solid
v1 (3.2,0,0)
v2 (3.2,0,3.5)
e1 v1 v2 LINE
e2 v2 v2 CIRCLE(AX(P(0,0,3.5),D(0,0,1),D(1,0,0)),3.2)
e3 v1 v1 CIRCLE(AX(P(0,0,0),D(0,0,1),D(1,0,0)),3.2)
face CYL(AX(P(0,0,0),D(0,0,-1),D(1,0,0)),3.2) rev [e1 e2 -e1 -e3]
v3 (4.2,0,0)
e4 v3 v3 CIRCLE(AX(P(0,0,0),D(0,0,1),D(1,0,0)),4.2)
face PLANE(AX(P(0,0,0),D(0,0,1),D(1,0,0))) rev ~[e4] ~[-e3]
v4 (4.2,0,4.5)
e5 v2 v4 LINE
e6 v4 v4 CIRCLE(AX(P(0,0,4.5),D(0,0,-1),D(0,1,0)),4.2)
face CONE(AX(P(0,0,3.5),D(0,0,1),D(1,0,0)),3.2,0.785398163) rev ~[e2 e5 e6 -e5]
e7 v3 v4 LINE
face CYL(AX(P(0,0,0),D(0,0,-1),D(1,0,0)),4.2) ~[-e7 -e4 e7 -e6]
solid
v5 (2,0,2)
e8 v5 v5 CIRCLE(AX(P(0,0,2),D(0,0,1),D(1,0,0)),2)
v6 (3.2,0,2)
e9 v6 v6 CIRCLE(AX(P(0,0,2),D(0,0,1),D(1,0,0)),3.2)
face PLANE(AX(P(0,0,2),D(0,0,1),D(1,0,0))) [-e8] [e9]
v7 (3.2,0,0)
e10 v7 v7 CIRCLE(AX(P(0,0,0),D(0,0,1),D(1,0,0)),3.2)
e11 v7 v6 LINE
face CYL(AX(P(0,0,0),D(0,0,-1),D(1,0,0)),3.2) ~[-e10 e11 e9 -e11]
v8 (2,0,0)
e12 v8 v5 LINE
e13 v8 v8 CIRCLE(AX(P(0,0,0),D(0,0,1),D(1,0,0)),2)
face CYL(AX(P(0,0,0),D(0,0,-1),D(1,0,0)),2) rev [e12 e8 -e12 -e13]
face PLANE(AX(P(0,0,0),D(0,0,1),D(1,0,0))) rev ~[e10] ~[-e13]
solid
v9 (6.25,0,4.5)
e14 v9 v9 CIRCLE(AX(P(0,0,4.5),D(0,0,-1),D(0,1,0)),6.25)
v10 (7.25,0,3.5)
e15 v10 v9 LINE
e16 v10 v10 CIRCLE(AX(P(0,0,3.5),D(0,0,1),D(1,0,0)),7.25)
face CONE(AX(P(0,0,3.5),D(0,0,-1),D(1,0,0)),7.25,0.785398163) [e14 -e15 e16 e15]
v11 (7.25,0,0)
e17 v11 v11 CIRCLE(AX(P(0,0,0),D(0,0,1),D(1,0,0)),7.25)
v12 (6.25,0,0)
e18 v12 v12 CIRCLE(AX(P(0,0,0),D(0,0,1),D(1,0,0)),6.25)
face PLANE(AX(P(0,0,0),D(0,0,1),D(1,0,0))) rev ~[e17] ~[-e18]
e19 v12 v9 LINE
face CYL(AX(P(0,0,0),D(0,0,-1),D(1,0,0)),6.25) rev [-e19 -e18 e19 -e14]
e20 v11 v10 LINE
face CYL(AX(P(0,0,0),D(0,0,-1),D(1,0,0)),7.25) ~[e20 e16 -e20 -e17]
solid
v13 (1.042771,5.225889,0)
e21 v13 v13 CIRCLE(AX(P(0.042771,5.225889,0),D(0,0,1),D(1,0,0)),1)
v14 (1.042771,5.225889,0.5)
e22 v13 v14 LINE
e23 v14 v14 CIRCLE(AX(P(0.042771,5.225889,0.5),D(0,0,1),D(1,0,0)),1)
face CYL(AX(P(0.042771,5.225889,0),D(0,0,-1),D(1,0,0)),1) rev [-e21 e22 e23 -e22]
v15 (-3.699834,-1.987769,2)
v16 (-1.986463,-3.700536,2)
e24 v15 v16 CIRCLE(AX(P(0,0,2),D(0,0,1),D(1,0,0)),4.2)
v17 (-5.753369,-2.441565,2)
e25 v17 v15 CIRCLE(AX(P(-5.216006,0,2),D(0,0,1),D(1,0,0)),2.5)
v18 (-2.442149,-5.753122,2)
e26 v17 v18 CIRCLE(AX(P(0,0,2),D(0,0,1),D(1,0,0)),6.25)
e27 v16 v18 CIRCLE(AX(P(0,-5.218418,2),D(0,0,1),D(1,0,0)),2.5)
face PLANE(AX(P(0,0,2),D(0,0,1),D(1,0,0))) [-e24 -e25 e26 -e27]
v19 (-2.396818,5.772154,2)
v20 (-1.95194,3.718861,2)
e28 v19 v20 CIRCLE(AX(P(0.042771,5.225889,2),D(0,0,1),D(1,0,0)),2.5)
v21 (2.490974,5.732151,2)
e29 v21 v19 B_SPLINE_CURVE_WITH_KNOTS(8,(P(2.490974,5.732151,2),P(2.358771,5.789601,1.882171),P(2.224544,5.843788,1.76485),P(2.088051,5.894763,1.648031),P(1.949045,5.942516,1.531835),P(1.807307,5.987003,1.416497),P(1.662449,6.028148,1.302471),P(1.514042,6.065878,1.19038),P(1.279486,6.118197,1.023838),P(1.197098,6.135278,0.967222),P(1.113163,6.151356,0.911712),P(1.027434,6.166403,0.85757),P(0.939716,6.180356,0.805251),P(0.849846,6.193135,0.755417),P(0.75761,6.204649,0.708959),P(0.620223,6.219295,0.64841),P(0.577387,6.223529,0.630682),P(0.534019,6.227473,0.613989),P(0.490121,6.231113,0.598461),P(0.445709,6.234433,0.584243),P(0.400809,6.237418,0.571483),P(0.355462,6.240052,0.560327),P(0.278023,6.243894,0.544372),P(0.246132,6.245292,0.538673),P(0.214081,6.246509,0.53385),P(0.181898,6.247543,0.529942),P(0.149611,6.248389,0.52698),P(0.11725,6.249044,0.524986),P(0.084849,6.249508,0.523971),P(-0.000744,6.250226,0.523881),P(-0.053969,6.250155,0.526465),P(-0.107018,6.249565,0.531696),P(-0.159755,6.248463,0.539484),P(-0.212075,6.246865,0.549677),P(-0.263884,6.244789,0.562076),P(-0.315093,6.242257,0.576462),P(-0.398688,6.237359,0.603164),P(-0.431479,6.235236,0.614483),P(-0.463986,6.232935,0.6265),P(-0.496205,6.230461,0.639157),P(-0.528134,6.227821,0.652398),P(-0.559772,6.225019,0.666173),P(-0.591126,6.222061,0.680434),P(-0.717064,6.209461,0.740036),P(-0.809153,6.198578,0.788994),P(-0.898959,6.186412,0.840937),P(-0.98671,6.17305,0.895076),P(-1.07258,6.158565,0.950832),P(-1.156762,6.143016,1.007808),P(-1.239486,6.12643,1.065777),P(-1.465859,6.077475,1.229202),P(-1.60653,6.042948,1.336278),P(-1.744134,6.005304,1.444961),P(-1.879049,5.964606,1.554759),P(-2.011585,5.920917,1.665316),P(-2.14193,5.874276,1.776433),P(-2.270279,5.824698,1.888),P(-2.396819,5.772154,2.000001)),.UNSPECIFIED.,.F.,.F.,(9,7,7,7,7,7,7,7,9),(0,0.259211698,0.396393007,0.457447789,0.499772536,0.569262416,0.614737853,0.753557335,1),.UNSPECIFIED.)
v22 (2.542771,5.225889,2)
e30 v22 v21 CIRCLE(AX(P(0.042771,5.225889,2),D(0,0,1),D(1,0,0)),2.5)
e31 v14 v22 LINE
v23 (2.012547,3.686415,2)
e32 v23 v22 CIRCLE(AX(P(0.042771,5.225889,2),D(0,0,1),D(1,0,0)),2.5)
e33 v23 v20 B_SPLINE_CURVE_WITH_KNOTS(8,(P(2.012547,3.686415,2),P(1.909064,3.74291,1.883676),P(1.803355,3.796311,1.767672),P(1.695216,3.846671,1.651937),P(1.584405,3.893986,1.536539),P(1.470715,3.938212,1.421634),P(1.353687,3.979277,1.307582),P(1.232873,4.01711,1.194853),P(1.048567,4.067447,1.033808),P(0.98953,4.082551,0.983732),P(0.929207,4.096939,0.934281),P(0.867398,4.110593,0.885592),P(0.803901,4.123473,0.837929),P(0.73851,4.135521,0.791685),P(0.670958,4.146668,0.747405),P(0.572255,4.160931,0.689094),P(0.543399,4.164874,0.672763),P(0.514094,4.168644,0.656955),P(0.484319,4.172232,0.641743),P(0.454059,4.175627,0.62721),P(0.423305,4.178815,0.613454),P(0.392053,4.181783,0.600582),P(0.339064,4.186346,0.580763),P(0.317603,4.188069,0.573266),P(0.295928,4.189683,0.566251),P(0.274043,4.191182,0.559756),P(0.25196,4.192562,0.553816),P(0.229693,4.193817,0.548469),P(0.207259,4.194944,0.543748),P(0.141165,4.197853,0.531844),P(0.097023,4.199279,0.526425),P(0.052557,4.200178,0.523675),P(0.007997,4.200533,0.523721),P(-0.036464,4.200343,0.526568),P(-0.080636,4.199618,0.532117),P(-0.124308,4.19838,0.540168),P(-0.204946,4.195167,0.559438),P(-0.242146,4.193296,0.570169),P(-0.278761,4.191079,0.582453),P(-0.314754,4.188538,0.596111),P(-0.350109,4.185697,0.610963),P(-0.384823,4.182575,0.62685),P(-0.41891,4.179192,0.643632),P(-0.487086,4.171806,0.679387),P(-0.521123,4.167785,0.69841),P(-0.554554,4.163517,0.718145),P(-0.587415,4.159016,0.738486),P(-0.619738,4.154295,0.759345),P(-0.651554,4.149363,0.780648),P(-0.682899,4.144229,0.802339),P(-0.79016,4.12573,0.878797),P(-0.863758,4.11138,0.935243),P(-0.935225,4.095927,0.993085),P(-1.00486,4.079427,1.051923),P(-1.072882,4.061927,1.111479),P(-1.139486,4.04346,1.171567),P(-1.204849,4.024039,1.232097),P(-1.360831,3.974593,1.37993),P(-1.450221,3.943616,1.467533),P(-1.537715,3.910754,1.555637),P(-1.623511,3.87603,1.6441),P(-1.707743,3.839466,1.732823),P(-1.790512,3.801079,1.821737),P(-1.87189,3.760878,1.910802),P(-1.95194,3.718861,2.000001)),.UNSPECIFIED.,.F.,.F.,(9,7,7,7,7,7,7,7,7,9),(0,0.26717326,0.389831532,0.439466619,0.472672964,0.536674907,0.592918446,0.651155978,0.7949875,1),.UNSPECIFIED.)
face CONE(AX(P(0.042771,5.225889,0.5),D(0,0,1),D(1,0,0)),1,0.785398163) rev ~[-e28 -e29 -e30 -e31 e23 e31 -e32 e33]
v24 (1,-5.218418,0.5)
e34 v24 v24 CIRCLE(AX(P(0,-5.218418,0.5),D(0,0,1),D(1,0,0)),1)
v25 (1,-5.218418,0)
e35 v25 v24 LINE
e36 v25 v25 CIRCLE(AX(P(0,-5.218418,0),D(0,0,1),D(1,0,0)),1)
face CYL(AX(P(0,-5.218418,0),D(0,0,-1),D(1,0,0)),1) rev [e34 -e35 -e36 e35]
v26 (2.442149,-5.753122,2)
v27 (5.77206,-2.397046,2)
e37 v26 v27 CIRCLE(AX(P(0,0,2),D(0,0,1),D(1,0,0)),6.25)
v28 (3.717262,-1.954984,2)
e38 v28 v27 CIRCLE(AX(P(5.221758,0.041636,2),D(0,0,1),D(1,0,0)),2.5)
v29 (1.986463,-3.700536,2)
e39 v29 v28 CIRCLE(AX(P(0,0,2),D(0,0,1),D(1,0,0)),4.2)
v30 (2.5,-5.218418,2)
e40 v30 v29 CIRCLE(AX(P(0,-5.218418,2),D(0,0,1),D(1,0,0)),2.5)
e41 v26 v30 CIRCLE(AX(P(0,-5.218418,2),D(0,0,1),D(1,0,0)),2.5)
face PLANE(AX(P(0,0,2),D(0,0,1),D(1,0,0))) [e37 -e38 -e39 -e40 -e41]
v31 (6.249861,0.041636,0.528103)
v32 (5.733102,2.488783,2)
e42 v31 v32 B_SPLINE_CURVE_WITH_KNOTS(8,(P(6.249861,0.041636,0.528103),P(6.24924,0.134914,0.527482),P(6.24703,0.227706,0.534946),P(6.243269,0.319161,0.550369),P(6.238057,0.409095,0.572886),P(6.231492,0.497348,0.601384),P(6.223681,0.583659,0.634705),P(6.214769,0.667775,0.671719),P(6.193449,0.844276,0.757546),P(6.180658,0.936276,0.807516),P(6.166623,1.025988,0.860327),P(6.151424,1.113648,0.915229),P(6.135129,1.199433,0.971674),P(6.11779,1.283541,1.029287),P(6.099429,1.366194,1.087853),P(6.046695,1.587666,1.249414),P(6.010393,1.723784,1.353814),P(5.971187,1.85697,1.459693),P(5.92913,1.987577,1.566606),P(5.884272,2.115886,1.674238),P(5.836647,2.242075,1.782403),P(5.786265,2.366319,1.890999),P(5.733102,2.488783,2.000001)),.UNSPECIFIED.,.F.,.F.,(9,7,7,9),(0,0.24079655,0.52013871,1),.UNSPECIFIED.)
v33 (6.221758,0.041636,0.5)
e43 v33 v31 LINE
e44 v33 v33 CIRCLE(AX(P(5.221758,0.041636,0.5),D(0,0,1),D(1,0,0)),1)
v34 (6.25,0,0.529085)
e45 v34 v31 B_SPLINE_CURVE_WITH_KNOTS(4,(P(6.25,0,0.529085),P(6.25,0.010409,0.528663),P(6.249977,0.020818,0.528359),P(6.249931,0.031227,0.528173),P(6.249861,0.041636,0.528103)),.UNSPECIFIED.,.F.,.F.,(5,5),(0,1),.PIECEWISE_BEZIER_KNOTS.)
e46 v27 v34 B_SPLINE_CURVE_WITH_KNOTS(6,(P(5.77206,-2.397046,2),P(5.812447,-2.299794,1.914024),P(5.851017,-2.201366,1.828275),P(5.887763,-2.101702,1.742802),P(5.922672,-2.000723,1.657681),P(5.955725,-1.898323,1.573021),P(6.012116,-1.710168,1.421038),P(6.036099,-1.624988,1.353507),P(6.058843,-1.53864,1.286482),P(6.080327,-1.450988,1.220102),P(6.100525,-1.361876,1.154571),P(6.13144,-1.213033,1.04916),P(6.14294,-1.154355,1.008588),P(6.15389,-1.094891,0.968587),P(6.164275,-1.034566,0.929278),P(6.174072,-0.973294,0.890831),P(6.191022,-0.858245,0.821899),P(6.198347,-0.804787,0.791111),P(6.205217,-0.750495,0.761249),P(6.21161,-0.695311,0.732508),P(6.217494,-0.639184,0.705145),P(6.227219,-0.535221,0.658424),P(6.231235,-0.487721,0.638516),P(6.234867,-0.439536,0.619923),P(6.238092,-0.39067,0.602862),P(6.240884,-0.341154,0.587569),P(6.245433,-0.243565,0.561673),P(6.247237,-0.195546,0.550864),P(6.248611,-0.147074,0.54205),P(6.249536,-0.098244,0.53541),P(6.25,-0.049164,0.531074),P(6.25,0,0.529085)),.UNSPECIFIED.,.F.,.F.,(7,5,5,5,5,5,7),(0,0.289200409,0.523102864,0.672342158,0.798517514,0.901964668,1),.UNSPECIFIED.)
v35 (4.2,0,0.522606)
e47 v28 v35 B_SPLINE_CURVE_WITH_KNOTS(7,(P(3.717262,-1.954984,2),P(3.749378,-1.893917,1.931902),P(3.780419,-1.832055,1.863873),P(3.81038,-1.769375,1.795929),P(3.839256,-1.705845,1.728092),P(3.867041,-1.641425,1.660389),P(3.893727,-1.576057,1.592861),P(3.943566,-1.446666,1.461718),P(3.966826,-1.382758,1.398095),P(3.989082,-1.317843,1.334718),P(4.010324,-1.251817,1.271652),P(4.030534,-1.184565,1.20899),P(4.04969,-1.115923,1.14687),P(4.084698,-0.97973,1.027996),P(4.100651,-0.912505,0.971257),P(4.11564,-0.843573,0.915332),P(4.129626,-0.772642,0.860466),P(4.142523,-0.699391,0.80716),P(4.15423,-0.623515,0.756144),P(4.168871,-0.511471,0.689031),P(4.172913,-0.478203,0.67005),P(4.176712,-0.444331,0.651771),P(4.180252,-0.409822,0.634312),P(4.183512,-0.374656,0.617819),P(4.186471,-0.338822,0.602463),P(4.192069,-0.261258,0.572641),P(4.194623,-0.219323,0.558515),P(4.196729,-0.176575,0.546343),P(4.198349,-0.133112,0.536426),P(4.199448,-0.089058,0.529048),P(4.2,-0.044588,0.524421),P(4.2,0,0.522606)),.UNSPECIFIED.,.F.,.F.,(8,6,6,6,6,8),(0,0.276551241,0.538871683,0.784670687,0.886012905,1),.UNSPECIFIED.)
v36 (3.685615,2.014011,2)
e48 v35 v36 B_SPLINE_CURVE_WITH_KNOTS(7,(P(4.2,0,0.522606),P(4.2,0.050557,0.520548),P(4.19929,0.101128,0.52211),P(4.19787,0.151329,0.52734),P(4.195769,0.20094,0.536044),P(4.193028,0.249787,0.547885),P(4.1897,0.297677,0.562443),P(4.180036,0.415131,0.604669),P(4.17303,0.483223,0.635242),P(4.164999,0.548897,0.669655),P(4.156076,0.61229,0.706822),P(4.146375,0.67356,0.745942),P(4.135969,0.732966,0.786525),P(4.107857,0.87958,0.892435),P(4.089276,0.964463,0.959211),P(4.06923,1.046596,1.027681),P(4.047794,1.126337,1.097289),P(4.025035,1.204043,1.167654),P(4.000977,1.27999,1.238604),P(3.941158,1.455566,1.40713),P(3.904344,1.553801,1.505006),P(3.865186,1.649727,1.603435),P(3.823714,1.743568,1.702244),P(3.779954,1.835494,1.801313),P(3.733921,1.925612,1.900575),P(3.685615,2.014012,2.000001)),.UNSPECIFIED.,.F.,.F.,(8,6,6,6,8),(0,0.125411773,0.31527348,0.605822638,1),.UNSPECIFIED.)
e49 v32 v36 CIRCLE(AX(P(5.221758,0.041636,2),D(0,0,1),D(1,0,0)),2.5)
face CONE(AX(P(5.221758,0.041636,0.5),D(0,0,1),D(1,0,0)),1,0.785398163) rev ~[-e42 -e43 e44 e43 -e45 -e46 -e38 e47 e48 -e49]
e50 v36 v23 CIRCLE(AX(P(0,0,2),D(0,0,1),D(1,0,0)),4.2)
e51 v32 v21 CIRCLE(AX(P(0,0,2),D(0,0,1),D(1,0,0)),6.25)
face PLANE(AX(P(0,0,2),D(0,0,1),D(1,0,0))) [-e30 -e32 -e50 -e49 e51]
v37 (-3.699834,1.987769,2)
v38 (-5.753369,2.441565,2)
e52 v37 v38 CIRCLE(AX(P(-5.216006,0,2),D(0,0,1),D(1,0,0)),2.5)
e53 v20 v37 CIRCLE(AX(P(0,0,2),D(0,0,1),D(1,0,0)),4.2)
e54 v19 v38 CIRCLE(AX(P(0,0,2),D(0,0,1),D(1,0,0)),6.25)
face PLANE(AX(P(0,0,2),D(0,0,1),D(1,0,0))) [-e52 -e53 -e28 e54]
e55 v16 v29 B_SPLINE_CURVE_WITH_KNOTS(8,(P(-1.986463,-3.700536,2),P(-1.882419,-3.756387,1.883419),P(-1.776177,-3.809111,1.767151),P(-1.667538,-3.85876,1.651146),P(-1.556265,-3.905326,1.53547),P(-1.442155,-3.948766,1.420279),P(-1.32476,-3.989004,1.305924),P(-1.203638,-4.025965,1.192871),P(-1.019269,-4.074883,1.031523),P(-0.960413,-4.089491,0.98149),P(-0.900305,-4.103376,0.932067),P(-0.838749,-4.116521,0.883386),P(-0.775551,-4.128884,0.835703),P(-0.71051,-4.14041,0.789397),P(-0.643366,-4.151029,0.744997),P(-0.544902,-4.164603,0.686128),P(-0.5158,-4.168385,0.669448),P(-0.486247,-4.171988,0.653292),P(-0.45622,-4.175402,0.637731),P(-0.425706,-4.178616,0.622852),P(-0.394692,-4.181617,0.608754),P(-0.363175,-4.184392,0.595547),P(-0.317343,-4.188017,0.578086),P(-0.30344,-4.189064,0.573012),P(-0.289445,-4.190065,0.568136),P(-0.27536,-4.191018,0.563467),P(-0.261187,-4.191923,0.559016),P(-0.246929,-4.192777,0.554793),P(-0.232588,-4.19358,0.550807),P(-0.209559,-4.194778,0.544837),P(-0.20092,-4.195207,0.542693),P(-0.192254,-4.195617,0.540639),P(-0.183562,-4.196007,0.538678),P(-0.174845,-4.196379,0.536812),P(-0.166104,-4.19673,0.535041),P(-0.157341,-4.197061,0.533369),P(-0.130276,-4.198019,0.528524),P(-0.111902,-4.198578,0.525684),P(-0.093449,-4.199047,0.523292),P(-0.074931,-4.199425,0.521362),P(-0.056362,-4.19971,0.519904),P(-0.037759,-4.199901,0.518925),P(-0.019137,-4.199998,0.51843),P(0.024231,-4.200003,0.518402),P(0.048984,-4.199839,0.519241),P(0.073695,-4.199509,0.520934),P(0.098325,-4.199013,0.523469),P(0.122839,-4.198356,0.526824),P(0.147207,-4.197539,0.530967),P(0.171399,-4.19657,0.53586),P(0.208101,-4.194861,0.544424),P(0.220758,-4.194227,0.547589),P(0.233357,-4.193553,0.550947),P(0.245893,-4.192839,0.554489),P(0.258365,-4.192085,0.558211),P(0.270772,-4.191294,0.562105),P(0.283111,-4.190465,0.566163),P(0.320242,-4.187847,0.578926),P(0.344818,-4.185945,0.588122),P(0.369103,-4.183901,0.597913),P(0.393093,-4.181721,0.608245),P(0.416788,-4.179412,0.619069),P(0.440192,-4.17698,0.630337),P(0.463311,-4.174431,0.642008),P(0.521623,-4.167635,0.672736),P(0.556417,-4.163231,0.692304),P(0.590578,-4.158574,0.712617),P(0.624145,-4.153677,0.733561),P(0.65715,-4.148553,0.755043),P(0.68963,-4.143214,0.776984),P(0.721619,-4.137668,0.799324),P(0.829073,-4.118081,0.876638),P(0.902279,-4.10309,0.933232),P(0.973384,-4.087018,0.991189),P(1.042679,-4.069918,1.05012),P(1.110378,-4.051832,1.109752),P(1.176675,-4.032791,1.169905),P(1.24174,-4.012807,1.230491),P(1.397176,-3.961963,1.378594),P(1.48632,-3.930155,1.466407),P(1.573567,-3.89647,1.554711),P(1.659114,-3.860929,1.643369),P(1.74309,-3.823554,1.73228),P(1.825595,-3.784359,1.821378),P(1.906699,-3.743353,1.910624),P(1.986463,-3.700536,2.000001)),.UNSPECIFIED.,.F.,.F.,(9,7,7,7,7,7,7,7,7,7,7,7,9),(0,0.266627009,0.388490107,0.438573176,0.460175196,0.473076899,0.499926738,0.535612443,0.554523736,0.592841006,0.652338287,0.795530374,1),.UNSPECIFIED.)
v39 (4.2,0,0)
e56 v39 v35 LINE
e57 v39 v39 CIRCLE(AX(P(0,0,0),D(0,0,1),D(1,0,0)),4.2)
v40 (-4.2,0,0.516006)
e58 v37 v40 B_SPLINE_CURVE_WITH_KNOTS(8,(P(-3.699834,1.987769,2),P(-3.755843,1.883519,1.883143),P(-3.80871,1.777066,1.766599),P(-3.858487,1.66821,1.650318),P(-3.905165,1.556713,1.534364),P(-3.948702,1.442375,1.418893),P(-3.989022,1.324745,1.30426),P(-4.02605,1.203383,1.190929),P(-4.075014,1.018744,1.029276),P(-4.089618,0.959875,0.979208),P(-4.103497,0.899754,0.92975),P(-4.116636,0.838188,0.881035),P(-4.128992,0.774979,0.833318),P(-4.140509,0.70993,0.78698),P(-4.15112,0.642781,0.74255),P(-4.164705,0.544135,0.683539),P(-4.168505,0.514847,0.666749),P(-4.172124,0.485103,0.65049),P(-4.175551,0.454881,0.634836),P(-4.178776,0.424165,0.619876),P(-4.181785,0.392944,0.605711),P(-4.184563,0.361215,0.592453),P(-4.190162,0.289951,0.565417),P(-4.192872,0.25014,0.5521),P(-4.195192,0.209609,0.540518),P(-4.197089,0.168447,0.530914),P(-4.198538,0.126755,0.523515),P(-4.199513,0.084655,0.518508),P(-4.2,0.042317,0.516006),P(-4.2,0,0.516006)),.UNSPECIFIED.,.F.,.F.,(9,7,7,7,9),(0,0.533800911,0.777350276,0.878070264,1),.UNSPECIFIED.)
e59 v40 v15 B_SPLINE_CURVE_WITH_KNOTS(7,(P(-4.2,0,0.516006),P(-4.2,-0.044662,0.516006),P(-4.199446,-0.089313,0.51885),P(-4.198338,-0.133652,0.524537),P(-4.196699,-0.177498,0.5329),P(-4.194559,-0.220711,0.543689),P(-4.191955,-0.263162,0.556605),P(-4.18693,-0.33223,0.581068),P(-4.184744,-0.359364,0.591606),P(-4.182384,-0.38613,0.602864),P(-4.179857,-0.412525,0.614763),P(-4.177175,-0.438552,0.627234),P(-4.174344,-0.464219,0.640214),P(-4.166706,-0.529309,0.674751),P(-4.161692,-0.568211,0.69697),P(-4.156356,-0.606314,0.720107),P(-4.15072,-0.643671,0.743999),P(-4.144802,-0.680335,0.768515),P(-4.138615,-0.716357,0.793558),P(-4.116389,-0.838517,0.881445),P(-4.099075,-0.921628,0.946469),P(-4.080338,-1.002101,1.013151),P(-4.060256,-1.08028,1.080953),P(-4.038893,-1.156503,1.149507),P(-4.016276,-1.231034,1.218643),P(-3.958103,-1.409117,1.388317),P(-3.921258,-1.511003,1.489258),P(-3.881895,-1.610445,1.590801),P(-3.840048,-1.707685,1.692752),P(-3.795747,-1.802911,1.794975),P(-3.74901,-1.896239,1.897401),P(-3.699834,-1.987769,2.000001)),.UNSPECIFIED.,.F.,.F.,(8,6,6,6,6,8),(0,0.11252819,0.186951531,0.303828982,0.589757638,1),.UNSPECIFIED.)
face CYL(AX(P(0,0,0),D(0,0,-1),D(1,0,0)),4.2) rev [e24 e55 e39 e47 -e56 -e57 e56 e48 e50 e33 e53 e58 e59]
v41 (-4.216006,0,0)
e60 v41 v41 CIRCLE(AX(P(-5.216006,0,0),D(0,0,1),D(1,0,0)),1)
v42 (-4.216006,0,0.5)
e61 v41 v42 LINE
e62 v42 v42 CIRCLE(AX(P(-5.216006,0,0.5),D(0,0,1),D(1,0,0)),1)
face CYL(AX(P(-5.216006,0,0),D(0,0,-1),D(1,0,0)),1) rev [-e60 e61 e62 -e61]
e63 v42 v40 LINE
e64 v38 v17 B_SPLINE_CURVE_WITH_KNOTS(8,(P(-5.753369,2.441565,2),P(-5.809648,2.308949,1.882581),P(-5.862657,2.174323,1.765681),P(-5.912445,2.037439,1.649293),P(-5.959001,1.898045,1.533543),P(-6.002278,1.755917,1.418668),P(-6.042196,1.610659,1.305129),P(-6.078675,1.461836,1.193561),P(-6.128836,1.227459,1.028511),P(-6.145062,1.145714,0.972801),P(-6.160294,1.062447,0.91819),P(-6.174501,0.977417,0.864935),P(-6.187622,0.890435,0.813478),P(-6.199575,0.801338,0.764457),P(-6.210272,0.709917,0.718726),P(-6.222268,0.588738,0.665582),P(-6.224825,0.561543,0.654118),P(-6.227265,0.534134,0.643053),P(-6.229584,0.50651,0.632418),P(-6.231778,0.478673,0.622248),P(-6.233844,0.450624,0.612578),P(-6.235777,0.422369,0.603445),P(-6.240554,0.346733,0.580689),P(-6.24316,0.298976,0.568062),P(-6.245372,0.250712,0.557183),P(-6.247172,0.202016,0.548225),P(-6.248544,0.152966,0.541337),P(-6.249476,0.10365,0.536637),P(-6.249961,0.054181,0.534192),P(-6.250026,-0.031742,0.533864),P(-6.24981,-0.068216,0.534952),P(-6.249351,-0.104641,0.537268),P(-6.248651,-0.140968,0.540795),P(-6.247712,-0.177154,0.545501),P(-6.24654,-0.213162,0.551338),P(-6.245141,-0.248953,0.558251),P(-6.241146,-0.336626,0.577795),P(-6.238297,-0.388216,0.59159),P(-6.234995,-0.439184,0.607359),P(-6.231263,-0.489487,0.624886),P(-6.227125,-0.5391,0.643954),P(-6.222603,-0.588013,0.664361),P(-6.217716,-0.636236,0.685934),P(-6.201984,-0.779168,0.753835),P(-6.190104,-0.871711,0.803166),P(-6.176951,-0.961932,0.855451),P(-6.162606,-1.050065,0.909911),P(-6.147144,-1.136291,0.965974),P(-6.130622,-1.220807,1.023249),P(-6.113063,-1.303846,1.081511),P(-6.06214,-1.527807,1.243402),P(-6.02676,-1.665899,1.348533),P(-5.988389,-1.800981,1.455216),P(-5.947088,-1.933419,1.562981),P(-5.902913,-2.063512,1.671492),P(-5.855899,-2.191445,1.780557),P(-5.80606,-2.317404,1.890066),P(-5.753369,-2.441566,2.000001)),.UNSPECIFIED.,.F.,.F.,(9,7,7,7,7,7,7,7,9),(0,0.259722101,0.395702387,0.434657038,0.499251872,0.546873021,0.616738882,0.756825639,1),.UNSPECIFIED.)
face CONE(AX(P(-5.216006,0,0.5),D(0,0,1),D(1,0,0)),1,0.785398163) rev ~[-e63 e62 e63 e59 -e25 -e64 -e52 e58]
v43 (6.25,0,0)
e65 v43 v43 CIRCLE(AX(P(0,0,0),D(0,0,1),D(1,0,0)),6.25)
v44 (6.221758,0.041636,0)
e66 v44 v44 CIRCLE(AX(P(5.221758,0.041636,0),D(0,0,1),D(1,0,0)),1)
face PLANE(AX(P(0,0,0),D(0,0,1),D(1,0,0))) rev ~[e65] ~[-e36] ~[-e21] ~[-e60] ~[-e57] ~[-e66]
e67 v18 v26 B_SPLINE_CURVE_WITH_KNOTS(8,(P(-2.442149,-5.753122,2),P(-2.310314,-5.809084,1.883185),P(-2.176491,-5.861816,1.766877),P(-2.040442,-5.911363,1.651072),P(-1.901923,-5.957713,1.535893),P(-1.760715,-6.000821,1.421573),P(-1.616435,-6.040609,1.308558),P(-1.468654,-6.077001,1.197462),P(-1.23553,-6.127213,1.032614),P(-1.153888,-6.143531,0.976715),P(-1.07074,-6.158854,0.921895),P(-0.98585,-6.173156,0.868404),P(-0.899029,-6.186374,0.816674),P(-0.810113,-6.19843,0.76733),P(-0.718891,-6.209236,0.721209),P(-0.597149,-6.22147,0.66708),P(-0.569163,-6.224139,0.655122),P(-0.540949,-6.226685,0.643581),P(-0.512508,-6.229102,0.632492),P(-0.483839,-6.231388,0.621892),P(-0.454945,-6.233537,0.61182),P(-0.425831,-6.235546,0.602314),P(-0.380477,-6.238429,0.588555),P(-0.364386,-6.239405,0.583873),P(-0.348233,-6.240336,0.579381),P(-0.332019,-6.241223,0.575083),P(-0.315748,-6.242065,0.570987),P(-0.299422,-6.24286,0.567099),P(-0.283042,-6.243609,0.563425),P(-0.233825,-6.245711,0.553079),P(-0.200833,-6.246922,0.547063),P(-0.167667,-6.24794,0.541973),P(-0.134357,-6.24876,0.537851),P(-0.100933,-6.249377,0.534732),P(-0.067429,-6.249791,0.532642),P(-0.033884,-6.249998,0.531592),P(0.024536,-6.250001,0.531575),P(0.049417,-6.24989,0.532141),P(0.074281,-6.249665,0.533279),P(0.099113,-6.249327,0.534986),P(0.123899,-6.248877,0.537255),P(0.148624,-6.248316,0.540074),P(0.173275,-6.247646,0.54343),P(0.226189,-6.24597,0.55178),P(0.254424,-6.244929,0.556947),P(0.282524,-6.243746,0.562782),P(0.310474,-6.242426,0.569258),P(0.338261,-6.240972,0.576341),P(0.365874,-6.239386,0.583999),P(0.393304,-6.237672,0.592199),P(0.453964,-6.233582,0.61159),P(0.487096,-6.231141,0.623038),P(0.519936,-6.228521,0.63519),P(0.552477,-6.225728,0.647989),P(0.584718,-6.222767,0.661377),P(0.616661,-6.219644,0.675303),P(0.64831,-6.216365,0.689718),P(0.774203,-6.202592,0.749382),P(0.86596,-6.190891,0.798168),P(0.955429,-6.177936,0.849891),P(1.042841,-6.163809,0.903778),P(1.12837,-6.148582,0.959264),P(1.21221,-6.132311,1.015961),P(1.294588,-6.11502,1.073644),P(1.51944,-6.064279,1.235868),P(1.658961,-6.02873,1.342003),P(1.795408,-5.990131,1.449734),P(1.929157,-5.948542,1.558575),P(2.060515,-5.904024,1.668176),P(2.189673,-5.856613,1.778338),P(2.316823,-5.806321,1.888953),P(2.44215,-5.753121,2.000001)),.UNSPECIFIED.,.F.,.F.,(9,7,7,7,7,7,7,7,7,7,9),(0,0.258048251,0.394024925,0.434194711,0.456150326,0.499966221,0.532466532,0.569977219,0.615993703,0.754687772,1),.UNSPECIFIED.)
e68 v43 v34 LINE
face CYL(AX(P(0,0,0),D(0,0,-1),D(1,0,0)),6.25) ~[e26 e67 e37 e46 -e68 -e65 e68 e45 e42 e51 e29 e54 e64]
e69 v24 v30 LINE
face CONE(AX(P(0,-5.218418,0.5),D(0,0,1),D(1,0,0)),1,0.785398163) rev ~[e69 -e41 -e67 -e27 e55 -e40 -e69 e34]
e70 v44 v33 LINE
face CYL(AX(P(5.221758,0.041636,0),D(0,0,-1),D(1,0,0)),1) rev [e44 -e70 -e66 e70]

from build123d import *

# Parameters (mm, degrees)
F0_R     = 7.25
F0_R_2   = 6.25
F1_DEPTH = 5
F0_R_3   = 4.2
F0_R_4   = 3.2
F0_R_5   = 2
F2_DEPTH = 2
F0_R_6   = 1


# Not quite as in the source:
# - a fillet or chamfer that OpenCascade refuses, or shapes differently, is made with other operations: its cross-section is extruded or revolved along the edge and cut away or added


with BuildPart() as f1:
    # F0 (on Top) → F1 (new body)
    with BuildSketch(Plane.XY):
        Circle(F0_R)
        Circle(F0_R_2, mode=Mode.SUBTRACT)
    extrude(amount=F1_DEPTH)

    # F3#3: chamfer of 1.5 on 1 edges, made by hand

    # F3_3_s1 → F3_3_t2 (revolve, cut)
    with BuildSketch(Plane.XZ):
        Polygon((7.25, 3.5), (5.75, 5), (7.25, 5), align=None)
    revolve(axis=Axis((0, 0, 5), (0, 0, 1)), mode=Mode.SUBTRACT)


with BuildPart() as f1b:
    # F0 (on Top) → F1, piece 2 (new body)
    with BuildSketch(Plane.XY):
        Circle(F0_R_3)
        Circle(F0_R_4, mode=Mode.SUBTRACT)
    extrude(amount=F1_DEPTH)

    # F3#2: chamfer of 1.5 on 1 edges, made by hand

    # F3_2_s1 → F3_2_t2 (revolve, cut)
    with BuildSketch(Plane.XZ):
        Polygon((3.2, 3.5), (4.7, 5), (3.2, 5), align=None)
    revolve(axis=Axis((0, 0, 5), (0, 0, 1)), mode=Mode.SUBTRACT)


with BuildPart() as f2:
    # F0 (on Top) → F2 (new body)
    with BuildSketch(Plane.XY):
        Circle(F0_R_4)
        Circle(F0_R_5, mode=Mode.SUBTRACT)
    extrude(amount=F2_DEPTH)


with BuildPart() as f2b:
    # F0 (on Top) → F2, piece 2 (new body)
    with BuildSketch(Plane.XY):
        Circle(F0_R_2)
        with Locations((0, -5.2184178494)):
            Circle(F0_R_6, mode=Mode.SUBTRACT)
        with Locations((-5.2160057239, 0)):
            Circle(F0_R_6, mode=Mode.SUBTRACT)
        Circle(F0_R_3, mode=Mode.SUBTRACT)
        with Locations((5.2217580378, 0.0416360635)):
            Circle(F0_R_6, mode=Mode.SUBTRACT)
        with Locations((0.0427705018, 5.2258885844)):
            Circle(F0_R_6, mode=Mode.SUBTRACT)
    extrude(amount=F2_DEPTH)

    # F3: chamfer of 1.5 on 4 edges, made by hand

    # F3_s1 → F3_t2 (revolve, cut)
    with BuildSketch(Plane.XZ):
        Polygon((-4.2160057239, 0.5), (-2.7160057239, 2), (-4.2160057239, 2), align=None)
    revolve(axis=Axis((-5.2160057239, 0, 2), (0, 0, 1)), mode=Mode.SUBTRACT)

    # F3_s3 → F3_t4 (revolve, cut)
    with BuildSketch(Plane.XZ.offset(5.2184178494)):
        Polygon((1, 0.5), (2.5, 2), (1, 2), align=None)
    revolve(axis=Axis((0, -5.2184178494, 2), (0, 0, 1)), mode=Mode.SUBTRACT)

    # F3_s5 → F3_t6 (revolve, cut)
    with BuildSketch(Plane.XZ.offset(-5.2258885844)):
        Polygon((1.0427705018, 0.5), (2.5427705018, 2), (1.0427705018, 2), align=None)
    revolve(axis=Axis((0.0427705018, 5.2258885844, 2), (0, 0, 1)), mode=Mode.SUBTRACT)

    # F3_s7 → F3_t8 (revolve, cut)
    with BuildSketch(Plane.XZ.offset(-0.0416360635)):
        Polygon((6.2217580378, 0.5), (7.7217580378, 2), (6.2217580378, 2), align=None)
    revolve(axis=Axis((5.2217580378, 0.0416360635, 2), (0, 0, 1)), mode=Mode.SUBTRACT)


solid = Compound([f1.part, f1b.part, f2.part, f2b.part])
